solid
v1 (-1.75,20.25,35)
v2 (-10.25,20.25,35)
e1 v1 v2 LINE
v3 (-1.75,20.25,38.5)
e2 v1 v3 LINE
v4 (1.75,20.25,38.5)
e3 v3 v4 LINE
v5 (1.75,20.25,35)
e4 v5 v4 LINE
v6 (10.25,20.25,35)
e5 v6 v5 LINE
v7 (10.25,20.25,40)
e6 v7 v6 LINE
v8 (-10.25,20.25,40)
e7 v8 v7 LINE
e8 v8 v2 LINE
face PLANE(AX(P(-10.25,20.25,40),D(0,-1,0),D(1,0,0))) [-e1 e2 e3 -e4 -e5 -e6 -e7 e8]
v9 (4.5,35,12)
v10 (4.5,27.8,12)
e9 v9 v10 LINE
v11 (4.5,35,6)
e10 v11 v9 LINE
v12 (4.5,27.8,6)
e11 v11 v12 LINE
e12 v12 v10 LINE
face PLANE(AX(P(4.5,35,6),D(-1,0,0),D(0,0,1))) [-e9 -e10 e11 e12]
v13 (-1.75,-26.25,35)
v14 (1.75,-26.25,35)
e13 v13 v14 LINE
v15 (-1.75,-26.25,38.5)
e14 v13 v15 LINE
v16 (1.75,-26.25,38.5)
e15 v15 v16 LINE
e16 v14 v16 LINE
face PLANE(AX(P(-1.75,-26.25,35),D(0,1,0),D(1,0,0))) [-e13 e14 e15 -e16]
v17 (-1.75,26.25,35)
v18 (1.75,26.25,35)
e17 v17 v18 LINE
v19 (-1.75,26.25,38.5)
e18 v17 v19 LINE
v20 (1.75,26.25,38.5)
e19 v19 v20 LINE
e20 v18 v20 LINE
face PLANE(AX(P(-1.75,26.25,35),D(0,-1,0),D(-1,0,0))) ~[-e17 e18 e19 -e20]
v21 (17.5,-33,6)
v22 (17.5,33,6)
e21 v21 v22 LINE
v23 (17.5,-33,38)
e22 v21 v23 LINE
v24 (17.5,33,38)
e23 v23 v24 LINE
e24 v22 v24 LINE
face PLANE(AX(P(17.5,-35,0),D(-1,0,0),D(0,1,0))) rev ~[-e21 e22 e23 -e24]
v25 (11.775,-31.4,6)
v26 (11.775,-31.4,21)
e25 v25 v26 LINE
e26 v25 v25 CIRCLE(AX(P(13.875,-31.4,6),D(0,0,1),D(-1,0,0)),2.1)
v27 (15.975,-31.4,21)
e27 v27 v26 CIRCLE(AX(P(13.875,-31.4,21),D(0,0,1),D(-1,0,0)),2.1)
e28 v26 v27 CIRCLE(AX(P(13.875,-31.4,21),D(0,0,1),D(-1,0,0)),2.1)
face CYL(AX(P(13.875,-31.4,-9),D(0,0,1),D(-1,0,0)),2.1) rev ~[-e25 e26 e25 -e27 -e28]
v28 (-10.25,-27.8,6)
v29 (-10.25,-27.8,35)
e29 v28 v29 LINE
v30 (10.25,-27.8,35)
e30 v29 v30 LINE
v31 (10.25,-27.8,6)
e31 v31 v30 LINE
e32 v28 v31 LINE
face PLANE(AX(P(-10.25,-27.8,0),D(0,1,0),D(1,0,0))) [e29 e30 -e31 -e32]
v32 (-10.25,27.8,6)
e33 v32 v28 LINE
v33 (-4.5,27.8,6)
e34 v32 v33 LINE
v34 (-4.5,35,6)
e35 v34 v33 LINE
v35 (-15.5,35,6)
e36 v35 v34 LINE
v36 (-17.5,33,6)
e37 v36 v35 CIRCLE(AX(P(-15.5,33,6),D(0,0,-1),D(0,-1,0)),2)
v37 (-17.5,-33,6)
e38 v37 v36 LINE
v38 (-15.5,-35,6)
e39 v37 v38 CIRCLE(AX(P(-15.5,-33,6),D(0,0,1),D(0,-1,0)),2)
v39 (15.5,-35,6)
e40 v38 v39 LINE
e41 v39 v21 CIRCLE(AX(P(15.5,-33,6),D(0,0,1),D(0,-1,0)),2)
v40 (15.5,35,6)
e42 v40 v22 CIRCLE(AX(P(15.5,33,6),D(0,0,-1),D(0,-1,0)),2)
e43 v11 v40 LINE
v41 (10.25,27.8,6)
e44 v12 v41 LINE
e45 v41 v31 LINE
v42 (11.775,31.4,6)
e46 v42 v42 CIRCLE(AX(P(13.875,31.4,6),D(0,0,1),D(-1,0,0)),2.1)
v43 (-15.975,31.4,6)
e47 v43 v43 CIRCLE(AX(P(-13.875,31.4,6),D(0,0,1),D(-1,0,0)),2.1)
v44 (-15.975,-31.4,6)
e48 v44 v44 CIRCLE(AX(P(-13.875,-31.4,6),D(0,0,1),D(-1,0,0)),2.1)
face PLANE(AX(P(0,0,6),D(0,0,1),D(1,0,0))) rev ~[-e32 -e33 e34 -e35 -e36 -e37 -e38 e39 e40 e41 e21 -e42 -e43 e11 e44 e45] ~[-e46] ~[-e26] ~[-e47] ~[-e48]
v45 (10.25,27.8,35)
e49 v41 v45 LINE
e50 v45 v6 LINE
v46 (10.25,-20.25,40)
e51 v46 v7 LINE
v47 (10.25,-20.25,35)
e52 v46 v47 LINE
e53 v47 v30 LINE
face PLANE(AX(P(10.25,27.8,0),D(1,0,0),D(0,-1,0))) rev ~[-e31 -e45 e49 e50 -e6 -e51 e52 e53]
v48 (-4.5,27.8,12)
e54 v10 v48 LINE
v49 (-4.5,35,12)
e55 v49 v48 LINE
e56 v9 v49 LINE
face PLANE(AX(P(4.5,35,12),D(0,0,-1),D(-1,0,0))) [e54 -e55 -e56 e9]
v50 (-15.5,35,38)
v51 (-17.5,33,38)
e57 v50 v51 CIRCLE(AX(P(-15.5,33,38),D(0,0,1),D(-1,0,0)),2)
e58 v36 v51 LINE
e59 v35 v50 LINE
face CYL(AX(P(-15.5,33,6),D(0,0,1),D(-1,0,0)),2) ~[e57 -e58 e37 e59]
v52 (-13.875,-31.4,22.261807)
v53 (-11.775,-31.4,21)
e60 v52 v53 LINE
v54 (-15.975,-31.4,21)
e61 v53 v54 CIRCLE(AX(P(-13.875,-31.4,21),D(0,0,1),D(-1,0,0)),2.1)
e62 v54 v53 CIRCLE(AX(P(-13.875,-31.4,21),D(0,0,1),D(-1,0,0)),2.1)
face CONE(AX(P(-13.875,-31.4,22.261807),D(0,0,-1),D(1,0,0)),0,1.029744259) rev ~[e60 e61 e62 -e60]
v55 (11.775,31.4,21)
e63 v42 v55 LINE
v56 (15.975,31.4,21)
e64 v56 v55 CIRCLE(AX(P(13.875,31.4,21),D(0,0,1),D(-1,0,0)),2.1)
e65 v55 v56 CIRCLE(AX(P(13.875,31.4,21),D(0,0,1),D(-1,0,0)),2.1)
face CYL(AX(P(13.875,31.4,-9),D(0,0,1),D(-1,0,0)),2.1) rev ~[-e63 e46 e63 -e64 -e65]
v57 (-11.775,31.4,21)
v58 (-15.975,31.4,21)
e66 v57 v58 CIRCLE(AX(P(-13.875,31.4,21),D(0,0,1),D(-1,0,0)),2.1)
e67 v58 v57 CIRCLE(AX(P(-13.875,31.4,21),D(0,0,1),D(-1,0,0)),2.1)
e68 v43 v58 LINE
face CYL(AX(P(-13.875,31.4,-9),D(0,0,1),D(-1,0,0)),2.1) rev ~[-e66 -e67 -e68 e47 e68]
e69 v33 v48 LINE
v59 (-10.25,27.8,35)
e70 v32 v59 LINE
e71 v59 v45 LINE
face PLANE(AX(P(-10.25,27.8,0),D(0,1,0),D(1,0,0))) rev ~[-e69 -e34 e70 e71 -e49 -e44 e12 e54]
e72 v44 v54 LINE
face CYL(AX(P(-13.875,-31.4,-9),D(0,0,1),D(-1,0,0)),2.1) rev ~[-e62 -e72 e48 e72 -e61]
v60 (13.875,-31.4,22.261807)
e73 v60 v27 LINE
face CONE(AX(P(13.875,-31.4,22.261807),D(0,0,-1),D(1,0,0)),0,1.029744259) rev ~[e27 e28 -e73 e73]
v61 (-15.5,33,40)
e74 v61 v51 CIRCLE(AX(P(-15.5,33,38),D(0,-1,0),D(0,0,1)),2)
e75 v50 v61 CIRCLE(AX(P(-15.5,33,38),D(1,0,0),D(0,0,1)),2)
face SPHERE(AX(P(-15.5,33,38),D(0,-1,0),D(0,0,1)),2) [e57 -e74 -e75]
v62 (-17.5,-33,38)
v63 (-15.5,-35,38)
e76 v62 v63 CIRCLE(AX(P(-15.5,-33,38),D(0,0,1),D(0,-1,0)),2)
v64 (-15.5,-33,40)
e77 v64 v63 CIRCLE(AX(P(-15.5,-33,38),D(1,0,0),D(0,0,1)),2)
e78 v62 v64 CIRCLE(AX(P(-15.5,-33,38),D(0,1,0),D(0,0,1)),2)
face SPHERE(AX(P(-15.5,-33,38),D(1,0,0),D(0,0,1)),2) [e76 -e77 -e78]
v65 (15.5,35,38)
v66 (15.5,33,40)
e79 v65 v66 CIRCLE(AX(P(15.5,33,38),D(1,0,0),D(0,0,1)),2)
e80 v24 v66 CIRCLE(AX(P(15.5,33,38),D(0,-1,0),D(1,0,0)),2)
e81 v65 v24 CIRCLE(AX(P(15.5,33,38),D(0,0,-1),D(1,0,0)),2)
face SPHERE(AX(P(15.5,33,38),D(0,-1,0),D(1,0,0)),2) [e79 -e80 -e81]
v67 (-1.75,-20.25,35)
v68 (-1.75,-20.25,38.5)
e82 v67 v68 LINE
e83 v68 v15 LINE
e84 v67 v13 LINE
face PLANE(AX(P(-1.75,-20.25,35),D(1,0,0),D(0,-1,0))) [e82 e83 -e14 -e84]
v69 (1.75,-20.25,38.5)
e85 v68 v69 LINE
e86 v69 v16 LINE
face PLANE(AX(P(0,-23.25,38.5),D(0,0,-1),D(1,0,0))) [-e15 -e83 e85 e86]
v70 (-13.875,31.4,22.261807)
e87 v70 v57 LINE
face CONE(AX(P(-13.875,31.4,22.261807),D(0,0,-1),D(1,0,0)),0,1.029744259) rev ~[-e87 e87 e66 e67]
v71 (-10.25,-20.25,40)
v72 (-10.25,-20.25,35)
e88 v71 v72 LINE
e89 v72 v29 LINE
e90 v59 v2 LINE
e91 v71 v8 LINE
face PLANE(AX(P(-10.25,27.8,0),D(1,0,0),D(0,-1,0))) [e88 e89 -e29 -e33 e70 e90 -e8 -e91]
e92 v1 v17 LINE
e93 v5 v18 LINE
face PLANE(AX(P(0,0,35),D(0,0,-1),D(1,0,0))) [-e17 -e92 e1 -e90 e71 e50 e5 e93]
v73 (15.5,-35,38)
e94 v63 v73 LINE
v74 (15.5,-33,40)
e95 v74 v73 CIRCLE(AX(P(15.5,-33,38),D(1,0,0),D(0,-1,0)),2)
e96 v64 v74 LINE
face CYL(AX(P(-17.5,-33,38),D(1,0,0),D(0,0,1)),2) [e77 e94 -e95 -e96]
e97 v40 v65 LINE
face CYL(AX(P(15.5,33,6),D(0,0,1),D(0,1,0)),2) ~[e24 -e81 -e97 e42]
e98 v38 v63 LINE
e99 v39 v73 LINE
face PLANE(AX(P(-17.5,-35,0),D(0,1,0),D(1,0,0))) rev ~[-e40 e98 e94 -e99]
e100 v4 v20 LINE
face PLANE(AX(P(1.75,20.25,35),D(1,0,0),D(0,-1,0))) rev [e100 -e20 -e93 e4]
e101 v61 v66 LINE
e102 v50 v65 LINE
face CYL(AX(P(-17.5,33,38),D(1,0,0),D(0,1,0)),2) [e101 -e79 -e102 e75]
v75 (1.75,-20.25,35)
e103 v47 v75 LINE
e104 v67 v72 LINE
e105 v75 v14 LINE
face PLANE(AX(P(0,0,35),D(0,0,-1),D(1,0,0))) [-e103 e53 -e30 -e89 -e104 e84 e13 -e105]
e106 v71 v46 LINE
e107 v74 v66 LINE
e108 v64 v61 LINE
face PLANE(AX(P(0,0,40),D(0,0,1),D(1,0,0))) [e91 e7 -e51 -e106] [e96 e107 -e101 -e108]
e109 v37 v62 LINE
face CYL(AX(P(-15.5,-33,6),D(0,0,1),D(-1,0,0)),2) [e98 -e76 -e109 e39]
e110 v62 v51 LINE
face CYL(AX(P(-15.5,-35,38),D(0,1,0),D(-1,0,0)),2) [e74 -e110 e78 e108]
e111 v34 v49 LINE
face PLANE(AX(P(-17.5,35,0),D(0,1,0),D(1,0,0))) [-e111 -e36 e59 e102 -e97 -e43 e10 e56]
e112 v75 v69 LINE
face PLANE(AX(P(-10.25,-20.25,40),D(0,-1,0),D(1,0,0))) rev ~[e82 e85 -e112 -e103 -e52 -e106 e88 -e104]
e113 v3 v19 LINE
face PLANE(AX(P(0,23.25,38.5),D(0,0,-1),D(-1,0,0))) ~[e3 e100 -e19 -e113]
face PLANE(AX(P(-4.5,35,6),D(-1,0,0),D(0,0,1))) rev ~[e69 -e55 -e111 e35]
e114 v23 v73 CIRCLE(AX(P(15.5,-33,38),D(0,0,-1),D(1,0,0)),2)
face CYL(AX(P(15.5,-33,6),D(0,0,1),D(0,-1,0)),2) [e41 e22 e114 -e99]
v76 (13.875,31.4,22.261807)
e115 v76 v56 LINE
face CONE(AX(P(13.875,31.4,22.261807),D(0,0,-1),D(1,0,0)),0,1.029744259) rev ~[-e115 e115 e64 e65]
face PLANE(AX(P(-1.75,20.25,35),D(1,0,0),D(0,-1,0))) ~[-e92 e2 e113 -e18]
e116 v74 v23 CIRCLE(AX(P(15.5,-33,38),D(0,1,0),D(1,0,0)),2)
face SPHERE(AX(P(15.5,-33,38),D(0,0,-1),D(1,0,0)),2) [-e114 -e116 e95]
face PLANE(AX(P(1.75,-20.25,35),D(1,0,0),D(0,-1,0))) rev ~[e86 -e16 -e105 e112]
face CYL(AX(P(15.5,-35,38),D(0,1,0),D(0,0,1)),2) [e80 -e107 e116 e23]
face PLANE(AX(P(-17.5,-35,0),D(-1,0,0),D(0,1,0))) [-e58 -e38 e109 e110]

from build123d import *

# Parameters (mm, degrees)
F0_W      = 35
F0_H      = 70
F1_DEPTH  = 40
F2_W      = 20.5
F2_H      = 55.6
F3_DEPTH  = 35
F4_W      = 20.5
F4_H      = 40.5
F5_DEPTH  = 25
F6_DEPTH  = 6
F7_W      = 3.5
F7_H      = 6
F8_DEPTH  = 3.5
F10_D     = 4.2
F10_DEPTH = 15
F10_TIP   = 1.2618073
F11_R     = 2
F12_W     = 9
F12_H     = 6
F13_DEPTH = 10


# Not quite as in the source:
# - a pattern or mirror of a feature is missing from the dataset's text; its kind, count and spacing are read off the source's solid


with BuildPart() as f1:
    # F0 (on Top) → F1 (new body)
    with BuildSketch(Plane.XY):
        Rectangle(F0_W, F0_H)
    extrude(amount=F1_DEPTH)

    # F2 (on face) → F3 (cut)
    with BuildSketch(Plane(origin=(0, 0, 0), x_dir=(1, 0, 0), z_dir=(0, 0, -1))):
        Rectangle(F2_W, F2_H)
    extrude(amount=-F3_DEPTH, mode=Mode.SUBTRACT)

    # F4 (on face) → F5 (cut)
    with BuildSketch(Plane.XY.offset(40)):
        Rectangle(F4_W, F4_H)
    extrude(amount=-F5_DEPTH, mode=Mode.SUBTRACT)

    # F6 (cut): a face of the model
    f6_faces = [f1.faces().sort_by_distance(p)[0] for p in [
        (16.7173762079, 0, 0),
    ]]
    extrude(f6_faces, amount=-F6_DEPTH, mode=Mode.SUBTRACT)

    # F7 (on face) → F8 (cut)
    with BuildSketch(Plane(origin=(0, 0, 35), x_dir=(1, 0, 0), z_dir=(0, 0, -1))):
        with Locations((0, 23.25)):
            Rectangle(F7_W, F7_H)
    f8 = extrude(amount=-F8_DEPTH, mode=Mode.SUBTRACT)

    # F8_copies: F8 across plane
    add(f8.mirror(Plane.ZX), mode=Mode.SUBTRACT)

    # F10
    with Locations(Plane(origin=(0, 0, 6), x_dir=(1, 0, 0), z_dir=(0, 0, -1))):
        with Locations((-13.875, 31.4), (13.875, 31.4), (13.875, -31.4), (-13.875, -31.4)):
            Hole(F10_D / 2, depth=F10_DEPTH)
            with Locations((0, 0, -(F10_DEPTH + F10_TIP / 2))):  # 118° drill point
                Cone(0, F10_D / 2, F10_TIP, mode=Mode.SUBTRACT)

    # F11
    f11_edges = [f1.edges().sort_by_distance(p)[0] for p in [
        (17.5, -35, 23),
        (17.5, 0, 40),
        (0, -35, 40),
        (-17.5, 0, 40),
        (17.5, 35, 23),
        (0, 35, 40),
        (-17.5, -35, 23),
        (-17.5, 35, 23),
    ]]
    fillet(f11_edges, radius=F11_R)

    # F12 (on face) → F13 (cut)
    with BuildSketch(Plane(origin=(0, 35, 0), x_dir=(-1, 0, 0), z_dir=(0, 1, 0))):
        with Locations((0, 9)):
            Rectangle(F12_W, F12_H)
    extrude(amount=-F13_DEPTH, mode=Mode.SUBTRACT)


solid = f1.part
